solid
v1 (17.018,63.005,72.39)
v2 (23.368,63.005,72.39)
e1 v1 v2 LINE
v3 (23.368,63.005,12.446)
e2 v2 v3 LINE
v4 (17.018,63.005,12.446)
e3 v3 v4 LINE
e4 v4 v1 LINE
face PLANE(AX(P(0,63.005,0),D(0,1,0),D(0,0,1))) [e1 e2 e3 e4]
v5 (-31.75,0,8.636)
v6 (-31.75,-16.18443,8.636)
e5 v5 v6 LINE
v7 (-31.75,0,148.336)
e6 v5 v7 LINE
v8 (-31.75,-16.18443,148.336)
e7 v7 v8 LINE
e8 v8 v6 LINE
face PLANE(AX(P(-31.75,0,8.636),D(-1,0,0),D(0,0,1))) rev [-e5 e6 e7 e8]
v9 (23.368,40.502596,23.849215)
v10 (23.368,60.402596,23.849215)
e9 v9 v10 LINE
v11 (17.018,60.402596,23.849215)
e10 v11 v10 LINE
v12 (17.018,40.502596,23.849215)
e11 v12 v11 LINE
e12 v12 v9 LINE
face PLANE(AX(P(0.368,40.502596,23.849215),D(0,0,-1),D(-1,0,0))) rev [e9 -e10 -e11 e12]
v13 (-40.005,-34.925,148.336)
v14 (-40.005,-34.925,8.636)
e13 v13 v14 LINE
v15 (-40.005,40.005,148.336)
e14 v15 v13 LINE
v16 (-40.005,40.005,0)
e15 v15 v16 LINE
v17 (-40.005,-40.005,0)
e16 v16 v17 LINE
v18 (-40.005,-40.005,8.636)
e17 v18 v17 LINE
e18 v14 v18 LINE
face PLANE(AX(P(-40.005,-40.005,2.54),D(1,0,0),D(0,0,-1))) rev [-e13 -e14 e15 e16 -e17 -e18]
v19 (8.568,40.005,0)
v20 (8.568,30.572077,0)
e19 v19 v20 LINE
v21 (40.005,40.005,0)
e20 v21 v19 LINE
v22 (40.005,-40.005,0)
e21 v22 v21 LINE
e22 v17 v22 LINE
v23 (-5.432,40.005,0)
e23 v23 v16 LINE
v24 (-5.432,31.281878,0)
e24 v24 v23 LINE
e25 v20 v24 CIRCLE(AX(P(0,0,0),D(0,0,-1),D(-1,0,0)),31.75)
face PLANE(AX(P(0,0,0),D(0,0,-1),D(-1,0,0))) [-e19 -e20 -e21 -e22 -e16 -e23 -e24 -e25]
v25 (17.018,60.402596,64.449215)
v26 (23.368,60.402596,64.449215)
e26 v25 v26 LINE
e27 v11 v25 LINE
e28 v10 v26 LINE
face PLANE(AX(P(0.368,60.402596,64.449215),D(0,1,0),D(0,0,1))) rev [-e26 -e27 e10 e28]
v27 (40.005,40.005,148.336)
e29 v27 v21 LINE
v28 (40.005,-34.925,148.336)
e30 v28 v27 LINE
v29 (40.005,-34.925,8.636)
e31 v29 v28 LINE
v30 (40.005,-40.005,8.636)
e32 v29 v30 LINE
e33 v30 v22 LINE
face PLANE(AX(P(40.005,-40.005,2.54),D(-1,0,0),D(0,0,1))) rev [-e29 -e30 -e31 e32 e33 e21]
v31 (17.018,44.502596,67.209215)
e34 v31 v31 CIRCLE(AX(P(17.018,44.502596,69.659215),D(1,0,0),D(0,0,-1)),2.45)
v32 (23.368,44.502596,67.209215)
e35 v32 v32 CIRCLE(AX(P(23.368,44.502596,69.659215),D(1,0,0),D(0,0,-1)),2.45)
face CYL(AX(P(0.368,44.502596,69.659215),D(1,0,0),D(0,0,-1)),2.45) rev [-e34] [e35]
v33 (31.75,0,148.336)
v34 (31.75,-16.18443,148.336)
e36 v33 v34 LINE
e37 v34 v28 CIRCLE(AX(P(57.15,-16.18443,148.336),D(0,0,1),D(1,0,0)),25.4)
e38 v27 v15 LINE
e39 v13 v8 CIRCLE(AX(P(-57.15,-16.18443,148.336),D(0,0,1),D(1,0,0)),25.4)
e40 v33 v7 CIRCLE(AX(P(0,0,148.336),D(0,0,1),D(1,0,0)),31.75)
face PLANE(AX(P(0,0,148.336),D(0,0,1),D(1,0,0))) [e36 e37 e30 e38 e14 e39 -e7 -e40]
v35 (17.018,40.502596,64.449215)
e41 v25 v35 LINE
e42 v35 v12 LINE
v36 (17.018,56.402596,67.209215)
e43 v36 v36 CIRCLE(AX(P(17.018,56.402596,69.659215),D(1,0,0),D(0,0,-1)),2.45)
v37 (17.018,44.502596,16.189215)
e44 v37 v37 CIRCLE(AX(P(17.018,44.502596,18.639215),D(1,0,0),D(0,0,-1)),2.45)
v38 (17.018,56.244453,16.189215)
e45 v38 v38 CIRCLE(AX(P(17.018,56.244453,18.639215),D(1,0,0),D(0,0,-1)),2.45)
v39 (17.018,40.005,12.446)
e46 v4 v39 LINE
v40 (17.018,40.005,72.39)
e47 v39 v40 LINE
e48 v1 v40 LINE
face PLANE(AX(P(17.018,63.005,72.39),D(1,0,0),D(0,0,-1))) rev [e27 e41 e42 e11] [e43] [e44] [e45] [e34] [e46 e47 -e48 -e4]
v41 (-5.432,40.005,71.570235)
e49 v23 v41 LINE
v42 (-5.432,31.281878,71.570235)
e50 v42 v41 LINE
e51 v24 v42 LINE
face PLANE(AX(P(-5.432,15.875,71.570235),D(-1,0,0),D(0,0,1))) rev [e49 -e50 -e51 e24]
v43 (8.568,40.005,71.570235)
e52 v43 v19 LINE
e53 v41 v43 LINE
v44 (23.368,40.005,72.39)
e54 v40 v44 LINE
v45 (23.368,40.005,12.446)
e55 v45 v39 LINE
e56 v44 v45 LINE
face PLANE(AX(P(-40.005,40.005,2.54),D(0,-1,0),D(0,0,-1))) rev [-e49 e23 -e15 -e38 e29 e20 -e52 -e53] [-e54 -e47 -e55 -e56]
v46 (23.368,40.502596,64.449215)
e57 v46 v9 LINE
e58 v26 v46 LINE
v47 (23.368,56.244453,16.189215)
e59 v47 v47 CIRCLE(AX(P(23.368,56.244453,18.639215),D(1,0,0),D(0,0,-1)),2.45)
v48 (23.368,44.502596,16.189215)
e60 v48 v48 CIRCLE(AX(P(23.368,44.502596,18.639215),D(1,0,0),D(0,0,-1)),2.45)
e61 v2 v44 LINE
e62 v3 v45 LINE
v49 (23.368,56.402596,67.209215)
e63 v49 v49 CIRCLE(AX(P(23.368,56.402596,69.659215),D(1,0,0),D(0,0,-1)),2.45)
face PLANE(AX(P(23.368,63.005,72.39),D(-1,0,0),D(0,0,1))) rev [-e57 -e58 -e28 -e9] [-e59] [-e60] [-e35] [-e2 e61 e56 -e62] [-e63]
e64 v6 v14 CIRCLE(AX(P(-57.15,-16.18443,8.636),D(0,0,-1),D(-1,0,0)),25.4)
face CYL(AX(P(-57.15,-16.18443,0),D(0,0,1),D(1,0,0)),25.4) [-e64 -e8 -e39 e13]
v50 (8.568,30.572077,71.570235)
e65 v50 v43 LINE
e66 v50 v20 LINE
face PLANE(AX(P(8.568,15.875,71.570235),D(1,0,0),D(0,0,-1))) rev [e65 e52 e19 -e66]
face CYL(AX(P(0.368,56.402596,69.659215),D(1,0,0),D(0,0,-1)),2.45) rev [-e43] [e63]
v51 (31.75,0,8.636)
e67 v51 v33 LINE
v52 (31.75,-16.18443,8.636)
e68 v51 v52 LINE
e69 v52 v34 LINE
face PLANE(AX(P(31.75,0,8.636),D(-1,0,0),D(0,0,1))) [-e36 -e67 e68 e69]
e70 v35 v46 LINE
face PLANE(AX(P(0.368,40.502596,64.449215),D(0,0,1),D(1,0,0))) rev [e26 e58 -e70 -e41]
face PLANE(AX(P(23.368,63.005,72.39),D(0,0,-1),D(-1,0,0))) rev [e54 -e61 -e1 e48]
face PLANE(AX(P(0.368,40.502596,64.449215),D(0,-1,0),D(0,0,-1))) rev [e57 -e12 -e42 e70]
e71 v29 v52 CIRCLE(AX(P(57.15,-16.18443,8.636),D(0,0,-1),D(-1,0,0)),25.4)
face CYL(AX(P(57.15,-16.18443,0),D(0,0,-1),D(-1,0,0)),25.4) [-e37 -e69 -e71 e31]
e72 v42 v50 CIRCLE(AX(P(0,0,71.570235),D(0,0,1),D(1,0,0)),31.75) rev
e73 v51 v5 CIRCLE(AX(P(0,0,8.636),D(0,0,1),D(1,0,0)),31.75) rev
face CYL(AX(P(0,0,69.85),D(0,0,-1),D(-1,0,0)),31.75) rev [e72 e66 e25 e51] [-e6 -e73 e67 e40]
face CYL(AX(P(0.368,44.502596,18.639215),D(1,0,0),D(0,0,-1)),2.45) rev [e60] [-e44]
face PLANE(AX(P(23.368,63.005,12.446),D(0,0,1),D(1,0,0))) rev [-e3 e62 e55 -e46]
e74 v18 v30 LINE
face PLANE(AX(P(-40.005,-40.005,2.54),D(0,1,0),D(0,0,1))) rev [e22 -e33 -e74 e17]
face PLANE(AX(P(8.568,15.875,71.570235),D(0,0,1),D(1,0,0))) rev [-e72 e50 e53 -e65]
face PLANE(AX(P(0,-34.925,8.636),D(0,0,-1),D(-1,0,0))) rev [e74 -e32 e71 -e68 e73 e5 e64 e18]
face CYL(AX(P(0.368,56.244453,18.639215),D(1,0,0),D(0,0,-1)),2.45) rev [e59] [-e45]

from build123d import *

# Parameters (mm, degrees)
SKETCH1_W           = 80.01
SKETCH1_H           = 80.01
BOSS_EXTRUDE1_DEPTH = 2.54
SKETCH2_W           = 80.01
SKETCH2_H           = 80.01
SKETCH2_W_2         = 69.85
SKETCH2_H_2         = 69.85
BOSS_EXTRUDE2_DEPTH = 145.796
SKETCH3_R           = 31.75
CUT_EXTRUDE1_DEPTH  = 69.85
SKETCH5_W           = 80.01
SKETCH5_H           = 139.7
CUT_EXTRUDE3_DEPTH  = 5.08
SKETCH6_W           = 69.85
SKETCH6_H           = 69.85
SKETCH6_R           = 31.75
BOSS_EXTRUDE3_DEPTH = 145.796
CUT_EXTRUDE5_START  = -139.7
CUT_EXTRUDE5_DEPTH  = 139.7
FILLET2_R           = 25.4
SKETCH9_W           = 6.35
SKETCH9_H           = 59.944
BOSS_EXTRUDE5_DEPTH = 23
SKETCH10_R          = 2.45
SKETCH10_W          = 40.6
SKETCH10_H          = 19.9
CUT_EXTRUDE7_DEPTH  = 23
SKETCH12_W          = 14
SKETCH12_H          = 72
CUT_EXTRUDE10_DEPTH = 24.13


with BuildPart() as part:
    # Sketch1 → Boss-Extrude1 (new body)
    with BuildSketch(Plane.XY):
        Rectangle(SKETCH1_W, SKETCH1_H)
    extrude(amount=BOSS_EXTRUDE1_DEPTH)

    # Sketch2 → Boss-Extrude2 (add)
    with BuildSketch(Plane.XY.offset(2.54)):
        Rectangle(SKETCH2_W, SKETCH2_H)
        Rectangle(SKETCH2_W_2, SKETCH2_H_2, mode=Mode.SUBTRACT)
    extrude(amount=BOSS_EXTRUDE2_DEPTH)

    # Sketch3 → Cut-Extrude1 (cut)
    with BuildSketch(Plane(origin=(0, 0, 0), x_dir=(-1, 0, 0), z_dir=(0, 0, -1))):
        Circle(SKETCH3_R)
    extrude(amount=-CUT_EXTRUDE1_DEPTH, mode=Mode.SUBTRACT)

    # Sketch5 → Cut-Extrude3 (cut)
    with BuildSketch(Plane.XZ.offset(40.005)):
        with Locations((0, 78.486)):
            Rectangle(SKETCH5_W, SKETCH5_H)
    extrude(amount=-CUT_EXTRUDE3_DEPTH, mode=Mode.SUBTRACT)

    # Sketch6 → Boss-Extrude3 (add)
    with BuildSketch(Plane.XY.offset(2.54)):
        Rectangle(SKETCH6_W, SKETCH6_H)
        with Locations(Location((0, 0, 0), (0, 0, 180))):
            Circle(SKETCH6_R, mode=Mode.SUBTRACT)
    extrude(amount=BOSS_EXTRUDE3_DEPTH)

    # Sketch8 → Cut-Extrude5 (cut)
    with BuildSketch(Plane.XY.offset(148.336).offset(CUT_EXTRUDE5_START)):
        with BuildLine():
            ThreePointArc((31.75, 0), (0, -31.75), (-31.75, 0))
            Line((-31.75, 0), (-31.75, -34.925))
            Line((-31.75, -34.925), (31.75, -34.925))
            Line((31.75, -34.925), (31.75, 0))
        make_face()
    extrude(amount=CUT_EXTRUDE5_DEPTH, mode=Mode.SUBTRACT)

    # Fillet2
    # the kernel refuses this fillet: 25.4 mm, written as the material it takes off along each edge
    with BuildSketch(Plane(origin=(31.75, -34.925, 8.636), x_dir=(1, 0, 0), z_dir=(0, 0, 1))) as fillet2_piece_1:
        with BuildLine():
            CenterArc((25.4, 18.740570295), FILLET2_R, 180, 47.545849796)
            Line((0, 18.740570295), (0, 0))
            Line((0, 0), (8.255, 0))
        make_face()
    extrude(amount=186.551425739, mode=Mode.SUBTRACT)
    with BuildSketch(Plane(origin=(-31.75, -34.925, 8.636), x_dir=(0, 1, 0), z_dir=(0, 0, 1))) as fillet2_piece_2:
        with BuildLine():
            CenterArc((18.740570295, 25.4), FILLET2_R, 222.454150204, 47.545849796)
            Line((0, 8.255), (0, 0))
            Line((0, 0), (18.740570295, 0))
        make_face()
    extrude(amount=186.551425739, mode=Mode.SUBTRACT)

    # Sketch9 → Boss-Extrude5 (add)
    with BuildSketch(Plane(origin=(0, 40.005, 0), x_dir=(1, 0, 0), z_dir=(0, 1, 0))):
        with Locations((20.193, -42.418)):
            Rectangle(SKETCH9_W, SKETCH9_H)
    extrude(amount=BOSS_EXTRUDE5_DEPTH)

    # Sketch10 → Cut-Extrude7 (cut)
    with BuildSketch(Plane(origin=(23.368, 0, 0), x_dir=(0, 0, -1), z_dir=(1, 0, 0))):
        with Locations((-69.659214709, 44.502596375)):
            Circle(SKETCH10_R)
        with Locations((-69.659214709, 56.402596375)):
            Circle(SKETCH10_R)
        with Locations((-18.639214709, 44.502596375)):
            Circle(SKETCH10_R)
        with Locations((-18.639214709, 56.244452771)):
            Circle(SKETCH10_R)
        with Locations((-44.149214709, 50.452596375)):
            Rectangle(SKETCH10_W, SKETCH10_H)
    extrude(amount=-CUT_EXTRUDE7_DEPTH, mode=Mode.SUBTRACT)

    # Sketch12 → Cut-Extrude10 (cut)
    with BuildSketch(Plane(origin=(0, 40.005, 0), x_dir=(1, 0, 0), z_dir=(0, 1, 0))):
        with Locations((1.568, -35.570235268)):
            Rectangle(SKETCH12_W, SKETCH12_H)
    extrude(amount=-CUT_EXTRUDE10_DEPTH, mode=Mode.SUBTRACT)


solid = part.part
